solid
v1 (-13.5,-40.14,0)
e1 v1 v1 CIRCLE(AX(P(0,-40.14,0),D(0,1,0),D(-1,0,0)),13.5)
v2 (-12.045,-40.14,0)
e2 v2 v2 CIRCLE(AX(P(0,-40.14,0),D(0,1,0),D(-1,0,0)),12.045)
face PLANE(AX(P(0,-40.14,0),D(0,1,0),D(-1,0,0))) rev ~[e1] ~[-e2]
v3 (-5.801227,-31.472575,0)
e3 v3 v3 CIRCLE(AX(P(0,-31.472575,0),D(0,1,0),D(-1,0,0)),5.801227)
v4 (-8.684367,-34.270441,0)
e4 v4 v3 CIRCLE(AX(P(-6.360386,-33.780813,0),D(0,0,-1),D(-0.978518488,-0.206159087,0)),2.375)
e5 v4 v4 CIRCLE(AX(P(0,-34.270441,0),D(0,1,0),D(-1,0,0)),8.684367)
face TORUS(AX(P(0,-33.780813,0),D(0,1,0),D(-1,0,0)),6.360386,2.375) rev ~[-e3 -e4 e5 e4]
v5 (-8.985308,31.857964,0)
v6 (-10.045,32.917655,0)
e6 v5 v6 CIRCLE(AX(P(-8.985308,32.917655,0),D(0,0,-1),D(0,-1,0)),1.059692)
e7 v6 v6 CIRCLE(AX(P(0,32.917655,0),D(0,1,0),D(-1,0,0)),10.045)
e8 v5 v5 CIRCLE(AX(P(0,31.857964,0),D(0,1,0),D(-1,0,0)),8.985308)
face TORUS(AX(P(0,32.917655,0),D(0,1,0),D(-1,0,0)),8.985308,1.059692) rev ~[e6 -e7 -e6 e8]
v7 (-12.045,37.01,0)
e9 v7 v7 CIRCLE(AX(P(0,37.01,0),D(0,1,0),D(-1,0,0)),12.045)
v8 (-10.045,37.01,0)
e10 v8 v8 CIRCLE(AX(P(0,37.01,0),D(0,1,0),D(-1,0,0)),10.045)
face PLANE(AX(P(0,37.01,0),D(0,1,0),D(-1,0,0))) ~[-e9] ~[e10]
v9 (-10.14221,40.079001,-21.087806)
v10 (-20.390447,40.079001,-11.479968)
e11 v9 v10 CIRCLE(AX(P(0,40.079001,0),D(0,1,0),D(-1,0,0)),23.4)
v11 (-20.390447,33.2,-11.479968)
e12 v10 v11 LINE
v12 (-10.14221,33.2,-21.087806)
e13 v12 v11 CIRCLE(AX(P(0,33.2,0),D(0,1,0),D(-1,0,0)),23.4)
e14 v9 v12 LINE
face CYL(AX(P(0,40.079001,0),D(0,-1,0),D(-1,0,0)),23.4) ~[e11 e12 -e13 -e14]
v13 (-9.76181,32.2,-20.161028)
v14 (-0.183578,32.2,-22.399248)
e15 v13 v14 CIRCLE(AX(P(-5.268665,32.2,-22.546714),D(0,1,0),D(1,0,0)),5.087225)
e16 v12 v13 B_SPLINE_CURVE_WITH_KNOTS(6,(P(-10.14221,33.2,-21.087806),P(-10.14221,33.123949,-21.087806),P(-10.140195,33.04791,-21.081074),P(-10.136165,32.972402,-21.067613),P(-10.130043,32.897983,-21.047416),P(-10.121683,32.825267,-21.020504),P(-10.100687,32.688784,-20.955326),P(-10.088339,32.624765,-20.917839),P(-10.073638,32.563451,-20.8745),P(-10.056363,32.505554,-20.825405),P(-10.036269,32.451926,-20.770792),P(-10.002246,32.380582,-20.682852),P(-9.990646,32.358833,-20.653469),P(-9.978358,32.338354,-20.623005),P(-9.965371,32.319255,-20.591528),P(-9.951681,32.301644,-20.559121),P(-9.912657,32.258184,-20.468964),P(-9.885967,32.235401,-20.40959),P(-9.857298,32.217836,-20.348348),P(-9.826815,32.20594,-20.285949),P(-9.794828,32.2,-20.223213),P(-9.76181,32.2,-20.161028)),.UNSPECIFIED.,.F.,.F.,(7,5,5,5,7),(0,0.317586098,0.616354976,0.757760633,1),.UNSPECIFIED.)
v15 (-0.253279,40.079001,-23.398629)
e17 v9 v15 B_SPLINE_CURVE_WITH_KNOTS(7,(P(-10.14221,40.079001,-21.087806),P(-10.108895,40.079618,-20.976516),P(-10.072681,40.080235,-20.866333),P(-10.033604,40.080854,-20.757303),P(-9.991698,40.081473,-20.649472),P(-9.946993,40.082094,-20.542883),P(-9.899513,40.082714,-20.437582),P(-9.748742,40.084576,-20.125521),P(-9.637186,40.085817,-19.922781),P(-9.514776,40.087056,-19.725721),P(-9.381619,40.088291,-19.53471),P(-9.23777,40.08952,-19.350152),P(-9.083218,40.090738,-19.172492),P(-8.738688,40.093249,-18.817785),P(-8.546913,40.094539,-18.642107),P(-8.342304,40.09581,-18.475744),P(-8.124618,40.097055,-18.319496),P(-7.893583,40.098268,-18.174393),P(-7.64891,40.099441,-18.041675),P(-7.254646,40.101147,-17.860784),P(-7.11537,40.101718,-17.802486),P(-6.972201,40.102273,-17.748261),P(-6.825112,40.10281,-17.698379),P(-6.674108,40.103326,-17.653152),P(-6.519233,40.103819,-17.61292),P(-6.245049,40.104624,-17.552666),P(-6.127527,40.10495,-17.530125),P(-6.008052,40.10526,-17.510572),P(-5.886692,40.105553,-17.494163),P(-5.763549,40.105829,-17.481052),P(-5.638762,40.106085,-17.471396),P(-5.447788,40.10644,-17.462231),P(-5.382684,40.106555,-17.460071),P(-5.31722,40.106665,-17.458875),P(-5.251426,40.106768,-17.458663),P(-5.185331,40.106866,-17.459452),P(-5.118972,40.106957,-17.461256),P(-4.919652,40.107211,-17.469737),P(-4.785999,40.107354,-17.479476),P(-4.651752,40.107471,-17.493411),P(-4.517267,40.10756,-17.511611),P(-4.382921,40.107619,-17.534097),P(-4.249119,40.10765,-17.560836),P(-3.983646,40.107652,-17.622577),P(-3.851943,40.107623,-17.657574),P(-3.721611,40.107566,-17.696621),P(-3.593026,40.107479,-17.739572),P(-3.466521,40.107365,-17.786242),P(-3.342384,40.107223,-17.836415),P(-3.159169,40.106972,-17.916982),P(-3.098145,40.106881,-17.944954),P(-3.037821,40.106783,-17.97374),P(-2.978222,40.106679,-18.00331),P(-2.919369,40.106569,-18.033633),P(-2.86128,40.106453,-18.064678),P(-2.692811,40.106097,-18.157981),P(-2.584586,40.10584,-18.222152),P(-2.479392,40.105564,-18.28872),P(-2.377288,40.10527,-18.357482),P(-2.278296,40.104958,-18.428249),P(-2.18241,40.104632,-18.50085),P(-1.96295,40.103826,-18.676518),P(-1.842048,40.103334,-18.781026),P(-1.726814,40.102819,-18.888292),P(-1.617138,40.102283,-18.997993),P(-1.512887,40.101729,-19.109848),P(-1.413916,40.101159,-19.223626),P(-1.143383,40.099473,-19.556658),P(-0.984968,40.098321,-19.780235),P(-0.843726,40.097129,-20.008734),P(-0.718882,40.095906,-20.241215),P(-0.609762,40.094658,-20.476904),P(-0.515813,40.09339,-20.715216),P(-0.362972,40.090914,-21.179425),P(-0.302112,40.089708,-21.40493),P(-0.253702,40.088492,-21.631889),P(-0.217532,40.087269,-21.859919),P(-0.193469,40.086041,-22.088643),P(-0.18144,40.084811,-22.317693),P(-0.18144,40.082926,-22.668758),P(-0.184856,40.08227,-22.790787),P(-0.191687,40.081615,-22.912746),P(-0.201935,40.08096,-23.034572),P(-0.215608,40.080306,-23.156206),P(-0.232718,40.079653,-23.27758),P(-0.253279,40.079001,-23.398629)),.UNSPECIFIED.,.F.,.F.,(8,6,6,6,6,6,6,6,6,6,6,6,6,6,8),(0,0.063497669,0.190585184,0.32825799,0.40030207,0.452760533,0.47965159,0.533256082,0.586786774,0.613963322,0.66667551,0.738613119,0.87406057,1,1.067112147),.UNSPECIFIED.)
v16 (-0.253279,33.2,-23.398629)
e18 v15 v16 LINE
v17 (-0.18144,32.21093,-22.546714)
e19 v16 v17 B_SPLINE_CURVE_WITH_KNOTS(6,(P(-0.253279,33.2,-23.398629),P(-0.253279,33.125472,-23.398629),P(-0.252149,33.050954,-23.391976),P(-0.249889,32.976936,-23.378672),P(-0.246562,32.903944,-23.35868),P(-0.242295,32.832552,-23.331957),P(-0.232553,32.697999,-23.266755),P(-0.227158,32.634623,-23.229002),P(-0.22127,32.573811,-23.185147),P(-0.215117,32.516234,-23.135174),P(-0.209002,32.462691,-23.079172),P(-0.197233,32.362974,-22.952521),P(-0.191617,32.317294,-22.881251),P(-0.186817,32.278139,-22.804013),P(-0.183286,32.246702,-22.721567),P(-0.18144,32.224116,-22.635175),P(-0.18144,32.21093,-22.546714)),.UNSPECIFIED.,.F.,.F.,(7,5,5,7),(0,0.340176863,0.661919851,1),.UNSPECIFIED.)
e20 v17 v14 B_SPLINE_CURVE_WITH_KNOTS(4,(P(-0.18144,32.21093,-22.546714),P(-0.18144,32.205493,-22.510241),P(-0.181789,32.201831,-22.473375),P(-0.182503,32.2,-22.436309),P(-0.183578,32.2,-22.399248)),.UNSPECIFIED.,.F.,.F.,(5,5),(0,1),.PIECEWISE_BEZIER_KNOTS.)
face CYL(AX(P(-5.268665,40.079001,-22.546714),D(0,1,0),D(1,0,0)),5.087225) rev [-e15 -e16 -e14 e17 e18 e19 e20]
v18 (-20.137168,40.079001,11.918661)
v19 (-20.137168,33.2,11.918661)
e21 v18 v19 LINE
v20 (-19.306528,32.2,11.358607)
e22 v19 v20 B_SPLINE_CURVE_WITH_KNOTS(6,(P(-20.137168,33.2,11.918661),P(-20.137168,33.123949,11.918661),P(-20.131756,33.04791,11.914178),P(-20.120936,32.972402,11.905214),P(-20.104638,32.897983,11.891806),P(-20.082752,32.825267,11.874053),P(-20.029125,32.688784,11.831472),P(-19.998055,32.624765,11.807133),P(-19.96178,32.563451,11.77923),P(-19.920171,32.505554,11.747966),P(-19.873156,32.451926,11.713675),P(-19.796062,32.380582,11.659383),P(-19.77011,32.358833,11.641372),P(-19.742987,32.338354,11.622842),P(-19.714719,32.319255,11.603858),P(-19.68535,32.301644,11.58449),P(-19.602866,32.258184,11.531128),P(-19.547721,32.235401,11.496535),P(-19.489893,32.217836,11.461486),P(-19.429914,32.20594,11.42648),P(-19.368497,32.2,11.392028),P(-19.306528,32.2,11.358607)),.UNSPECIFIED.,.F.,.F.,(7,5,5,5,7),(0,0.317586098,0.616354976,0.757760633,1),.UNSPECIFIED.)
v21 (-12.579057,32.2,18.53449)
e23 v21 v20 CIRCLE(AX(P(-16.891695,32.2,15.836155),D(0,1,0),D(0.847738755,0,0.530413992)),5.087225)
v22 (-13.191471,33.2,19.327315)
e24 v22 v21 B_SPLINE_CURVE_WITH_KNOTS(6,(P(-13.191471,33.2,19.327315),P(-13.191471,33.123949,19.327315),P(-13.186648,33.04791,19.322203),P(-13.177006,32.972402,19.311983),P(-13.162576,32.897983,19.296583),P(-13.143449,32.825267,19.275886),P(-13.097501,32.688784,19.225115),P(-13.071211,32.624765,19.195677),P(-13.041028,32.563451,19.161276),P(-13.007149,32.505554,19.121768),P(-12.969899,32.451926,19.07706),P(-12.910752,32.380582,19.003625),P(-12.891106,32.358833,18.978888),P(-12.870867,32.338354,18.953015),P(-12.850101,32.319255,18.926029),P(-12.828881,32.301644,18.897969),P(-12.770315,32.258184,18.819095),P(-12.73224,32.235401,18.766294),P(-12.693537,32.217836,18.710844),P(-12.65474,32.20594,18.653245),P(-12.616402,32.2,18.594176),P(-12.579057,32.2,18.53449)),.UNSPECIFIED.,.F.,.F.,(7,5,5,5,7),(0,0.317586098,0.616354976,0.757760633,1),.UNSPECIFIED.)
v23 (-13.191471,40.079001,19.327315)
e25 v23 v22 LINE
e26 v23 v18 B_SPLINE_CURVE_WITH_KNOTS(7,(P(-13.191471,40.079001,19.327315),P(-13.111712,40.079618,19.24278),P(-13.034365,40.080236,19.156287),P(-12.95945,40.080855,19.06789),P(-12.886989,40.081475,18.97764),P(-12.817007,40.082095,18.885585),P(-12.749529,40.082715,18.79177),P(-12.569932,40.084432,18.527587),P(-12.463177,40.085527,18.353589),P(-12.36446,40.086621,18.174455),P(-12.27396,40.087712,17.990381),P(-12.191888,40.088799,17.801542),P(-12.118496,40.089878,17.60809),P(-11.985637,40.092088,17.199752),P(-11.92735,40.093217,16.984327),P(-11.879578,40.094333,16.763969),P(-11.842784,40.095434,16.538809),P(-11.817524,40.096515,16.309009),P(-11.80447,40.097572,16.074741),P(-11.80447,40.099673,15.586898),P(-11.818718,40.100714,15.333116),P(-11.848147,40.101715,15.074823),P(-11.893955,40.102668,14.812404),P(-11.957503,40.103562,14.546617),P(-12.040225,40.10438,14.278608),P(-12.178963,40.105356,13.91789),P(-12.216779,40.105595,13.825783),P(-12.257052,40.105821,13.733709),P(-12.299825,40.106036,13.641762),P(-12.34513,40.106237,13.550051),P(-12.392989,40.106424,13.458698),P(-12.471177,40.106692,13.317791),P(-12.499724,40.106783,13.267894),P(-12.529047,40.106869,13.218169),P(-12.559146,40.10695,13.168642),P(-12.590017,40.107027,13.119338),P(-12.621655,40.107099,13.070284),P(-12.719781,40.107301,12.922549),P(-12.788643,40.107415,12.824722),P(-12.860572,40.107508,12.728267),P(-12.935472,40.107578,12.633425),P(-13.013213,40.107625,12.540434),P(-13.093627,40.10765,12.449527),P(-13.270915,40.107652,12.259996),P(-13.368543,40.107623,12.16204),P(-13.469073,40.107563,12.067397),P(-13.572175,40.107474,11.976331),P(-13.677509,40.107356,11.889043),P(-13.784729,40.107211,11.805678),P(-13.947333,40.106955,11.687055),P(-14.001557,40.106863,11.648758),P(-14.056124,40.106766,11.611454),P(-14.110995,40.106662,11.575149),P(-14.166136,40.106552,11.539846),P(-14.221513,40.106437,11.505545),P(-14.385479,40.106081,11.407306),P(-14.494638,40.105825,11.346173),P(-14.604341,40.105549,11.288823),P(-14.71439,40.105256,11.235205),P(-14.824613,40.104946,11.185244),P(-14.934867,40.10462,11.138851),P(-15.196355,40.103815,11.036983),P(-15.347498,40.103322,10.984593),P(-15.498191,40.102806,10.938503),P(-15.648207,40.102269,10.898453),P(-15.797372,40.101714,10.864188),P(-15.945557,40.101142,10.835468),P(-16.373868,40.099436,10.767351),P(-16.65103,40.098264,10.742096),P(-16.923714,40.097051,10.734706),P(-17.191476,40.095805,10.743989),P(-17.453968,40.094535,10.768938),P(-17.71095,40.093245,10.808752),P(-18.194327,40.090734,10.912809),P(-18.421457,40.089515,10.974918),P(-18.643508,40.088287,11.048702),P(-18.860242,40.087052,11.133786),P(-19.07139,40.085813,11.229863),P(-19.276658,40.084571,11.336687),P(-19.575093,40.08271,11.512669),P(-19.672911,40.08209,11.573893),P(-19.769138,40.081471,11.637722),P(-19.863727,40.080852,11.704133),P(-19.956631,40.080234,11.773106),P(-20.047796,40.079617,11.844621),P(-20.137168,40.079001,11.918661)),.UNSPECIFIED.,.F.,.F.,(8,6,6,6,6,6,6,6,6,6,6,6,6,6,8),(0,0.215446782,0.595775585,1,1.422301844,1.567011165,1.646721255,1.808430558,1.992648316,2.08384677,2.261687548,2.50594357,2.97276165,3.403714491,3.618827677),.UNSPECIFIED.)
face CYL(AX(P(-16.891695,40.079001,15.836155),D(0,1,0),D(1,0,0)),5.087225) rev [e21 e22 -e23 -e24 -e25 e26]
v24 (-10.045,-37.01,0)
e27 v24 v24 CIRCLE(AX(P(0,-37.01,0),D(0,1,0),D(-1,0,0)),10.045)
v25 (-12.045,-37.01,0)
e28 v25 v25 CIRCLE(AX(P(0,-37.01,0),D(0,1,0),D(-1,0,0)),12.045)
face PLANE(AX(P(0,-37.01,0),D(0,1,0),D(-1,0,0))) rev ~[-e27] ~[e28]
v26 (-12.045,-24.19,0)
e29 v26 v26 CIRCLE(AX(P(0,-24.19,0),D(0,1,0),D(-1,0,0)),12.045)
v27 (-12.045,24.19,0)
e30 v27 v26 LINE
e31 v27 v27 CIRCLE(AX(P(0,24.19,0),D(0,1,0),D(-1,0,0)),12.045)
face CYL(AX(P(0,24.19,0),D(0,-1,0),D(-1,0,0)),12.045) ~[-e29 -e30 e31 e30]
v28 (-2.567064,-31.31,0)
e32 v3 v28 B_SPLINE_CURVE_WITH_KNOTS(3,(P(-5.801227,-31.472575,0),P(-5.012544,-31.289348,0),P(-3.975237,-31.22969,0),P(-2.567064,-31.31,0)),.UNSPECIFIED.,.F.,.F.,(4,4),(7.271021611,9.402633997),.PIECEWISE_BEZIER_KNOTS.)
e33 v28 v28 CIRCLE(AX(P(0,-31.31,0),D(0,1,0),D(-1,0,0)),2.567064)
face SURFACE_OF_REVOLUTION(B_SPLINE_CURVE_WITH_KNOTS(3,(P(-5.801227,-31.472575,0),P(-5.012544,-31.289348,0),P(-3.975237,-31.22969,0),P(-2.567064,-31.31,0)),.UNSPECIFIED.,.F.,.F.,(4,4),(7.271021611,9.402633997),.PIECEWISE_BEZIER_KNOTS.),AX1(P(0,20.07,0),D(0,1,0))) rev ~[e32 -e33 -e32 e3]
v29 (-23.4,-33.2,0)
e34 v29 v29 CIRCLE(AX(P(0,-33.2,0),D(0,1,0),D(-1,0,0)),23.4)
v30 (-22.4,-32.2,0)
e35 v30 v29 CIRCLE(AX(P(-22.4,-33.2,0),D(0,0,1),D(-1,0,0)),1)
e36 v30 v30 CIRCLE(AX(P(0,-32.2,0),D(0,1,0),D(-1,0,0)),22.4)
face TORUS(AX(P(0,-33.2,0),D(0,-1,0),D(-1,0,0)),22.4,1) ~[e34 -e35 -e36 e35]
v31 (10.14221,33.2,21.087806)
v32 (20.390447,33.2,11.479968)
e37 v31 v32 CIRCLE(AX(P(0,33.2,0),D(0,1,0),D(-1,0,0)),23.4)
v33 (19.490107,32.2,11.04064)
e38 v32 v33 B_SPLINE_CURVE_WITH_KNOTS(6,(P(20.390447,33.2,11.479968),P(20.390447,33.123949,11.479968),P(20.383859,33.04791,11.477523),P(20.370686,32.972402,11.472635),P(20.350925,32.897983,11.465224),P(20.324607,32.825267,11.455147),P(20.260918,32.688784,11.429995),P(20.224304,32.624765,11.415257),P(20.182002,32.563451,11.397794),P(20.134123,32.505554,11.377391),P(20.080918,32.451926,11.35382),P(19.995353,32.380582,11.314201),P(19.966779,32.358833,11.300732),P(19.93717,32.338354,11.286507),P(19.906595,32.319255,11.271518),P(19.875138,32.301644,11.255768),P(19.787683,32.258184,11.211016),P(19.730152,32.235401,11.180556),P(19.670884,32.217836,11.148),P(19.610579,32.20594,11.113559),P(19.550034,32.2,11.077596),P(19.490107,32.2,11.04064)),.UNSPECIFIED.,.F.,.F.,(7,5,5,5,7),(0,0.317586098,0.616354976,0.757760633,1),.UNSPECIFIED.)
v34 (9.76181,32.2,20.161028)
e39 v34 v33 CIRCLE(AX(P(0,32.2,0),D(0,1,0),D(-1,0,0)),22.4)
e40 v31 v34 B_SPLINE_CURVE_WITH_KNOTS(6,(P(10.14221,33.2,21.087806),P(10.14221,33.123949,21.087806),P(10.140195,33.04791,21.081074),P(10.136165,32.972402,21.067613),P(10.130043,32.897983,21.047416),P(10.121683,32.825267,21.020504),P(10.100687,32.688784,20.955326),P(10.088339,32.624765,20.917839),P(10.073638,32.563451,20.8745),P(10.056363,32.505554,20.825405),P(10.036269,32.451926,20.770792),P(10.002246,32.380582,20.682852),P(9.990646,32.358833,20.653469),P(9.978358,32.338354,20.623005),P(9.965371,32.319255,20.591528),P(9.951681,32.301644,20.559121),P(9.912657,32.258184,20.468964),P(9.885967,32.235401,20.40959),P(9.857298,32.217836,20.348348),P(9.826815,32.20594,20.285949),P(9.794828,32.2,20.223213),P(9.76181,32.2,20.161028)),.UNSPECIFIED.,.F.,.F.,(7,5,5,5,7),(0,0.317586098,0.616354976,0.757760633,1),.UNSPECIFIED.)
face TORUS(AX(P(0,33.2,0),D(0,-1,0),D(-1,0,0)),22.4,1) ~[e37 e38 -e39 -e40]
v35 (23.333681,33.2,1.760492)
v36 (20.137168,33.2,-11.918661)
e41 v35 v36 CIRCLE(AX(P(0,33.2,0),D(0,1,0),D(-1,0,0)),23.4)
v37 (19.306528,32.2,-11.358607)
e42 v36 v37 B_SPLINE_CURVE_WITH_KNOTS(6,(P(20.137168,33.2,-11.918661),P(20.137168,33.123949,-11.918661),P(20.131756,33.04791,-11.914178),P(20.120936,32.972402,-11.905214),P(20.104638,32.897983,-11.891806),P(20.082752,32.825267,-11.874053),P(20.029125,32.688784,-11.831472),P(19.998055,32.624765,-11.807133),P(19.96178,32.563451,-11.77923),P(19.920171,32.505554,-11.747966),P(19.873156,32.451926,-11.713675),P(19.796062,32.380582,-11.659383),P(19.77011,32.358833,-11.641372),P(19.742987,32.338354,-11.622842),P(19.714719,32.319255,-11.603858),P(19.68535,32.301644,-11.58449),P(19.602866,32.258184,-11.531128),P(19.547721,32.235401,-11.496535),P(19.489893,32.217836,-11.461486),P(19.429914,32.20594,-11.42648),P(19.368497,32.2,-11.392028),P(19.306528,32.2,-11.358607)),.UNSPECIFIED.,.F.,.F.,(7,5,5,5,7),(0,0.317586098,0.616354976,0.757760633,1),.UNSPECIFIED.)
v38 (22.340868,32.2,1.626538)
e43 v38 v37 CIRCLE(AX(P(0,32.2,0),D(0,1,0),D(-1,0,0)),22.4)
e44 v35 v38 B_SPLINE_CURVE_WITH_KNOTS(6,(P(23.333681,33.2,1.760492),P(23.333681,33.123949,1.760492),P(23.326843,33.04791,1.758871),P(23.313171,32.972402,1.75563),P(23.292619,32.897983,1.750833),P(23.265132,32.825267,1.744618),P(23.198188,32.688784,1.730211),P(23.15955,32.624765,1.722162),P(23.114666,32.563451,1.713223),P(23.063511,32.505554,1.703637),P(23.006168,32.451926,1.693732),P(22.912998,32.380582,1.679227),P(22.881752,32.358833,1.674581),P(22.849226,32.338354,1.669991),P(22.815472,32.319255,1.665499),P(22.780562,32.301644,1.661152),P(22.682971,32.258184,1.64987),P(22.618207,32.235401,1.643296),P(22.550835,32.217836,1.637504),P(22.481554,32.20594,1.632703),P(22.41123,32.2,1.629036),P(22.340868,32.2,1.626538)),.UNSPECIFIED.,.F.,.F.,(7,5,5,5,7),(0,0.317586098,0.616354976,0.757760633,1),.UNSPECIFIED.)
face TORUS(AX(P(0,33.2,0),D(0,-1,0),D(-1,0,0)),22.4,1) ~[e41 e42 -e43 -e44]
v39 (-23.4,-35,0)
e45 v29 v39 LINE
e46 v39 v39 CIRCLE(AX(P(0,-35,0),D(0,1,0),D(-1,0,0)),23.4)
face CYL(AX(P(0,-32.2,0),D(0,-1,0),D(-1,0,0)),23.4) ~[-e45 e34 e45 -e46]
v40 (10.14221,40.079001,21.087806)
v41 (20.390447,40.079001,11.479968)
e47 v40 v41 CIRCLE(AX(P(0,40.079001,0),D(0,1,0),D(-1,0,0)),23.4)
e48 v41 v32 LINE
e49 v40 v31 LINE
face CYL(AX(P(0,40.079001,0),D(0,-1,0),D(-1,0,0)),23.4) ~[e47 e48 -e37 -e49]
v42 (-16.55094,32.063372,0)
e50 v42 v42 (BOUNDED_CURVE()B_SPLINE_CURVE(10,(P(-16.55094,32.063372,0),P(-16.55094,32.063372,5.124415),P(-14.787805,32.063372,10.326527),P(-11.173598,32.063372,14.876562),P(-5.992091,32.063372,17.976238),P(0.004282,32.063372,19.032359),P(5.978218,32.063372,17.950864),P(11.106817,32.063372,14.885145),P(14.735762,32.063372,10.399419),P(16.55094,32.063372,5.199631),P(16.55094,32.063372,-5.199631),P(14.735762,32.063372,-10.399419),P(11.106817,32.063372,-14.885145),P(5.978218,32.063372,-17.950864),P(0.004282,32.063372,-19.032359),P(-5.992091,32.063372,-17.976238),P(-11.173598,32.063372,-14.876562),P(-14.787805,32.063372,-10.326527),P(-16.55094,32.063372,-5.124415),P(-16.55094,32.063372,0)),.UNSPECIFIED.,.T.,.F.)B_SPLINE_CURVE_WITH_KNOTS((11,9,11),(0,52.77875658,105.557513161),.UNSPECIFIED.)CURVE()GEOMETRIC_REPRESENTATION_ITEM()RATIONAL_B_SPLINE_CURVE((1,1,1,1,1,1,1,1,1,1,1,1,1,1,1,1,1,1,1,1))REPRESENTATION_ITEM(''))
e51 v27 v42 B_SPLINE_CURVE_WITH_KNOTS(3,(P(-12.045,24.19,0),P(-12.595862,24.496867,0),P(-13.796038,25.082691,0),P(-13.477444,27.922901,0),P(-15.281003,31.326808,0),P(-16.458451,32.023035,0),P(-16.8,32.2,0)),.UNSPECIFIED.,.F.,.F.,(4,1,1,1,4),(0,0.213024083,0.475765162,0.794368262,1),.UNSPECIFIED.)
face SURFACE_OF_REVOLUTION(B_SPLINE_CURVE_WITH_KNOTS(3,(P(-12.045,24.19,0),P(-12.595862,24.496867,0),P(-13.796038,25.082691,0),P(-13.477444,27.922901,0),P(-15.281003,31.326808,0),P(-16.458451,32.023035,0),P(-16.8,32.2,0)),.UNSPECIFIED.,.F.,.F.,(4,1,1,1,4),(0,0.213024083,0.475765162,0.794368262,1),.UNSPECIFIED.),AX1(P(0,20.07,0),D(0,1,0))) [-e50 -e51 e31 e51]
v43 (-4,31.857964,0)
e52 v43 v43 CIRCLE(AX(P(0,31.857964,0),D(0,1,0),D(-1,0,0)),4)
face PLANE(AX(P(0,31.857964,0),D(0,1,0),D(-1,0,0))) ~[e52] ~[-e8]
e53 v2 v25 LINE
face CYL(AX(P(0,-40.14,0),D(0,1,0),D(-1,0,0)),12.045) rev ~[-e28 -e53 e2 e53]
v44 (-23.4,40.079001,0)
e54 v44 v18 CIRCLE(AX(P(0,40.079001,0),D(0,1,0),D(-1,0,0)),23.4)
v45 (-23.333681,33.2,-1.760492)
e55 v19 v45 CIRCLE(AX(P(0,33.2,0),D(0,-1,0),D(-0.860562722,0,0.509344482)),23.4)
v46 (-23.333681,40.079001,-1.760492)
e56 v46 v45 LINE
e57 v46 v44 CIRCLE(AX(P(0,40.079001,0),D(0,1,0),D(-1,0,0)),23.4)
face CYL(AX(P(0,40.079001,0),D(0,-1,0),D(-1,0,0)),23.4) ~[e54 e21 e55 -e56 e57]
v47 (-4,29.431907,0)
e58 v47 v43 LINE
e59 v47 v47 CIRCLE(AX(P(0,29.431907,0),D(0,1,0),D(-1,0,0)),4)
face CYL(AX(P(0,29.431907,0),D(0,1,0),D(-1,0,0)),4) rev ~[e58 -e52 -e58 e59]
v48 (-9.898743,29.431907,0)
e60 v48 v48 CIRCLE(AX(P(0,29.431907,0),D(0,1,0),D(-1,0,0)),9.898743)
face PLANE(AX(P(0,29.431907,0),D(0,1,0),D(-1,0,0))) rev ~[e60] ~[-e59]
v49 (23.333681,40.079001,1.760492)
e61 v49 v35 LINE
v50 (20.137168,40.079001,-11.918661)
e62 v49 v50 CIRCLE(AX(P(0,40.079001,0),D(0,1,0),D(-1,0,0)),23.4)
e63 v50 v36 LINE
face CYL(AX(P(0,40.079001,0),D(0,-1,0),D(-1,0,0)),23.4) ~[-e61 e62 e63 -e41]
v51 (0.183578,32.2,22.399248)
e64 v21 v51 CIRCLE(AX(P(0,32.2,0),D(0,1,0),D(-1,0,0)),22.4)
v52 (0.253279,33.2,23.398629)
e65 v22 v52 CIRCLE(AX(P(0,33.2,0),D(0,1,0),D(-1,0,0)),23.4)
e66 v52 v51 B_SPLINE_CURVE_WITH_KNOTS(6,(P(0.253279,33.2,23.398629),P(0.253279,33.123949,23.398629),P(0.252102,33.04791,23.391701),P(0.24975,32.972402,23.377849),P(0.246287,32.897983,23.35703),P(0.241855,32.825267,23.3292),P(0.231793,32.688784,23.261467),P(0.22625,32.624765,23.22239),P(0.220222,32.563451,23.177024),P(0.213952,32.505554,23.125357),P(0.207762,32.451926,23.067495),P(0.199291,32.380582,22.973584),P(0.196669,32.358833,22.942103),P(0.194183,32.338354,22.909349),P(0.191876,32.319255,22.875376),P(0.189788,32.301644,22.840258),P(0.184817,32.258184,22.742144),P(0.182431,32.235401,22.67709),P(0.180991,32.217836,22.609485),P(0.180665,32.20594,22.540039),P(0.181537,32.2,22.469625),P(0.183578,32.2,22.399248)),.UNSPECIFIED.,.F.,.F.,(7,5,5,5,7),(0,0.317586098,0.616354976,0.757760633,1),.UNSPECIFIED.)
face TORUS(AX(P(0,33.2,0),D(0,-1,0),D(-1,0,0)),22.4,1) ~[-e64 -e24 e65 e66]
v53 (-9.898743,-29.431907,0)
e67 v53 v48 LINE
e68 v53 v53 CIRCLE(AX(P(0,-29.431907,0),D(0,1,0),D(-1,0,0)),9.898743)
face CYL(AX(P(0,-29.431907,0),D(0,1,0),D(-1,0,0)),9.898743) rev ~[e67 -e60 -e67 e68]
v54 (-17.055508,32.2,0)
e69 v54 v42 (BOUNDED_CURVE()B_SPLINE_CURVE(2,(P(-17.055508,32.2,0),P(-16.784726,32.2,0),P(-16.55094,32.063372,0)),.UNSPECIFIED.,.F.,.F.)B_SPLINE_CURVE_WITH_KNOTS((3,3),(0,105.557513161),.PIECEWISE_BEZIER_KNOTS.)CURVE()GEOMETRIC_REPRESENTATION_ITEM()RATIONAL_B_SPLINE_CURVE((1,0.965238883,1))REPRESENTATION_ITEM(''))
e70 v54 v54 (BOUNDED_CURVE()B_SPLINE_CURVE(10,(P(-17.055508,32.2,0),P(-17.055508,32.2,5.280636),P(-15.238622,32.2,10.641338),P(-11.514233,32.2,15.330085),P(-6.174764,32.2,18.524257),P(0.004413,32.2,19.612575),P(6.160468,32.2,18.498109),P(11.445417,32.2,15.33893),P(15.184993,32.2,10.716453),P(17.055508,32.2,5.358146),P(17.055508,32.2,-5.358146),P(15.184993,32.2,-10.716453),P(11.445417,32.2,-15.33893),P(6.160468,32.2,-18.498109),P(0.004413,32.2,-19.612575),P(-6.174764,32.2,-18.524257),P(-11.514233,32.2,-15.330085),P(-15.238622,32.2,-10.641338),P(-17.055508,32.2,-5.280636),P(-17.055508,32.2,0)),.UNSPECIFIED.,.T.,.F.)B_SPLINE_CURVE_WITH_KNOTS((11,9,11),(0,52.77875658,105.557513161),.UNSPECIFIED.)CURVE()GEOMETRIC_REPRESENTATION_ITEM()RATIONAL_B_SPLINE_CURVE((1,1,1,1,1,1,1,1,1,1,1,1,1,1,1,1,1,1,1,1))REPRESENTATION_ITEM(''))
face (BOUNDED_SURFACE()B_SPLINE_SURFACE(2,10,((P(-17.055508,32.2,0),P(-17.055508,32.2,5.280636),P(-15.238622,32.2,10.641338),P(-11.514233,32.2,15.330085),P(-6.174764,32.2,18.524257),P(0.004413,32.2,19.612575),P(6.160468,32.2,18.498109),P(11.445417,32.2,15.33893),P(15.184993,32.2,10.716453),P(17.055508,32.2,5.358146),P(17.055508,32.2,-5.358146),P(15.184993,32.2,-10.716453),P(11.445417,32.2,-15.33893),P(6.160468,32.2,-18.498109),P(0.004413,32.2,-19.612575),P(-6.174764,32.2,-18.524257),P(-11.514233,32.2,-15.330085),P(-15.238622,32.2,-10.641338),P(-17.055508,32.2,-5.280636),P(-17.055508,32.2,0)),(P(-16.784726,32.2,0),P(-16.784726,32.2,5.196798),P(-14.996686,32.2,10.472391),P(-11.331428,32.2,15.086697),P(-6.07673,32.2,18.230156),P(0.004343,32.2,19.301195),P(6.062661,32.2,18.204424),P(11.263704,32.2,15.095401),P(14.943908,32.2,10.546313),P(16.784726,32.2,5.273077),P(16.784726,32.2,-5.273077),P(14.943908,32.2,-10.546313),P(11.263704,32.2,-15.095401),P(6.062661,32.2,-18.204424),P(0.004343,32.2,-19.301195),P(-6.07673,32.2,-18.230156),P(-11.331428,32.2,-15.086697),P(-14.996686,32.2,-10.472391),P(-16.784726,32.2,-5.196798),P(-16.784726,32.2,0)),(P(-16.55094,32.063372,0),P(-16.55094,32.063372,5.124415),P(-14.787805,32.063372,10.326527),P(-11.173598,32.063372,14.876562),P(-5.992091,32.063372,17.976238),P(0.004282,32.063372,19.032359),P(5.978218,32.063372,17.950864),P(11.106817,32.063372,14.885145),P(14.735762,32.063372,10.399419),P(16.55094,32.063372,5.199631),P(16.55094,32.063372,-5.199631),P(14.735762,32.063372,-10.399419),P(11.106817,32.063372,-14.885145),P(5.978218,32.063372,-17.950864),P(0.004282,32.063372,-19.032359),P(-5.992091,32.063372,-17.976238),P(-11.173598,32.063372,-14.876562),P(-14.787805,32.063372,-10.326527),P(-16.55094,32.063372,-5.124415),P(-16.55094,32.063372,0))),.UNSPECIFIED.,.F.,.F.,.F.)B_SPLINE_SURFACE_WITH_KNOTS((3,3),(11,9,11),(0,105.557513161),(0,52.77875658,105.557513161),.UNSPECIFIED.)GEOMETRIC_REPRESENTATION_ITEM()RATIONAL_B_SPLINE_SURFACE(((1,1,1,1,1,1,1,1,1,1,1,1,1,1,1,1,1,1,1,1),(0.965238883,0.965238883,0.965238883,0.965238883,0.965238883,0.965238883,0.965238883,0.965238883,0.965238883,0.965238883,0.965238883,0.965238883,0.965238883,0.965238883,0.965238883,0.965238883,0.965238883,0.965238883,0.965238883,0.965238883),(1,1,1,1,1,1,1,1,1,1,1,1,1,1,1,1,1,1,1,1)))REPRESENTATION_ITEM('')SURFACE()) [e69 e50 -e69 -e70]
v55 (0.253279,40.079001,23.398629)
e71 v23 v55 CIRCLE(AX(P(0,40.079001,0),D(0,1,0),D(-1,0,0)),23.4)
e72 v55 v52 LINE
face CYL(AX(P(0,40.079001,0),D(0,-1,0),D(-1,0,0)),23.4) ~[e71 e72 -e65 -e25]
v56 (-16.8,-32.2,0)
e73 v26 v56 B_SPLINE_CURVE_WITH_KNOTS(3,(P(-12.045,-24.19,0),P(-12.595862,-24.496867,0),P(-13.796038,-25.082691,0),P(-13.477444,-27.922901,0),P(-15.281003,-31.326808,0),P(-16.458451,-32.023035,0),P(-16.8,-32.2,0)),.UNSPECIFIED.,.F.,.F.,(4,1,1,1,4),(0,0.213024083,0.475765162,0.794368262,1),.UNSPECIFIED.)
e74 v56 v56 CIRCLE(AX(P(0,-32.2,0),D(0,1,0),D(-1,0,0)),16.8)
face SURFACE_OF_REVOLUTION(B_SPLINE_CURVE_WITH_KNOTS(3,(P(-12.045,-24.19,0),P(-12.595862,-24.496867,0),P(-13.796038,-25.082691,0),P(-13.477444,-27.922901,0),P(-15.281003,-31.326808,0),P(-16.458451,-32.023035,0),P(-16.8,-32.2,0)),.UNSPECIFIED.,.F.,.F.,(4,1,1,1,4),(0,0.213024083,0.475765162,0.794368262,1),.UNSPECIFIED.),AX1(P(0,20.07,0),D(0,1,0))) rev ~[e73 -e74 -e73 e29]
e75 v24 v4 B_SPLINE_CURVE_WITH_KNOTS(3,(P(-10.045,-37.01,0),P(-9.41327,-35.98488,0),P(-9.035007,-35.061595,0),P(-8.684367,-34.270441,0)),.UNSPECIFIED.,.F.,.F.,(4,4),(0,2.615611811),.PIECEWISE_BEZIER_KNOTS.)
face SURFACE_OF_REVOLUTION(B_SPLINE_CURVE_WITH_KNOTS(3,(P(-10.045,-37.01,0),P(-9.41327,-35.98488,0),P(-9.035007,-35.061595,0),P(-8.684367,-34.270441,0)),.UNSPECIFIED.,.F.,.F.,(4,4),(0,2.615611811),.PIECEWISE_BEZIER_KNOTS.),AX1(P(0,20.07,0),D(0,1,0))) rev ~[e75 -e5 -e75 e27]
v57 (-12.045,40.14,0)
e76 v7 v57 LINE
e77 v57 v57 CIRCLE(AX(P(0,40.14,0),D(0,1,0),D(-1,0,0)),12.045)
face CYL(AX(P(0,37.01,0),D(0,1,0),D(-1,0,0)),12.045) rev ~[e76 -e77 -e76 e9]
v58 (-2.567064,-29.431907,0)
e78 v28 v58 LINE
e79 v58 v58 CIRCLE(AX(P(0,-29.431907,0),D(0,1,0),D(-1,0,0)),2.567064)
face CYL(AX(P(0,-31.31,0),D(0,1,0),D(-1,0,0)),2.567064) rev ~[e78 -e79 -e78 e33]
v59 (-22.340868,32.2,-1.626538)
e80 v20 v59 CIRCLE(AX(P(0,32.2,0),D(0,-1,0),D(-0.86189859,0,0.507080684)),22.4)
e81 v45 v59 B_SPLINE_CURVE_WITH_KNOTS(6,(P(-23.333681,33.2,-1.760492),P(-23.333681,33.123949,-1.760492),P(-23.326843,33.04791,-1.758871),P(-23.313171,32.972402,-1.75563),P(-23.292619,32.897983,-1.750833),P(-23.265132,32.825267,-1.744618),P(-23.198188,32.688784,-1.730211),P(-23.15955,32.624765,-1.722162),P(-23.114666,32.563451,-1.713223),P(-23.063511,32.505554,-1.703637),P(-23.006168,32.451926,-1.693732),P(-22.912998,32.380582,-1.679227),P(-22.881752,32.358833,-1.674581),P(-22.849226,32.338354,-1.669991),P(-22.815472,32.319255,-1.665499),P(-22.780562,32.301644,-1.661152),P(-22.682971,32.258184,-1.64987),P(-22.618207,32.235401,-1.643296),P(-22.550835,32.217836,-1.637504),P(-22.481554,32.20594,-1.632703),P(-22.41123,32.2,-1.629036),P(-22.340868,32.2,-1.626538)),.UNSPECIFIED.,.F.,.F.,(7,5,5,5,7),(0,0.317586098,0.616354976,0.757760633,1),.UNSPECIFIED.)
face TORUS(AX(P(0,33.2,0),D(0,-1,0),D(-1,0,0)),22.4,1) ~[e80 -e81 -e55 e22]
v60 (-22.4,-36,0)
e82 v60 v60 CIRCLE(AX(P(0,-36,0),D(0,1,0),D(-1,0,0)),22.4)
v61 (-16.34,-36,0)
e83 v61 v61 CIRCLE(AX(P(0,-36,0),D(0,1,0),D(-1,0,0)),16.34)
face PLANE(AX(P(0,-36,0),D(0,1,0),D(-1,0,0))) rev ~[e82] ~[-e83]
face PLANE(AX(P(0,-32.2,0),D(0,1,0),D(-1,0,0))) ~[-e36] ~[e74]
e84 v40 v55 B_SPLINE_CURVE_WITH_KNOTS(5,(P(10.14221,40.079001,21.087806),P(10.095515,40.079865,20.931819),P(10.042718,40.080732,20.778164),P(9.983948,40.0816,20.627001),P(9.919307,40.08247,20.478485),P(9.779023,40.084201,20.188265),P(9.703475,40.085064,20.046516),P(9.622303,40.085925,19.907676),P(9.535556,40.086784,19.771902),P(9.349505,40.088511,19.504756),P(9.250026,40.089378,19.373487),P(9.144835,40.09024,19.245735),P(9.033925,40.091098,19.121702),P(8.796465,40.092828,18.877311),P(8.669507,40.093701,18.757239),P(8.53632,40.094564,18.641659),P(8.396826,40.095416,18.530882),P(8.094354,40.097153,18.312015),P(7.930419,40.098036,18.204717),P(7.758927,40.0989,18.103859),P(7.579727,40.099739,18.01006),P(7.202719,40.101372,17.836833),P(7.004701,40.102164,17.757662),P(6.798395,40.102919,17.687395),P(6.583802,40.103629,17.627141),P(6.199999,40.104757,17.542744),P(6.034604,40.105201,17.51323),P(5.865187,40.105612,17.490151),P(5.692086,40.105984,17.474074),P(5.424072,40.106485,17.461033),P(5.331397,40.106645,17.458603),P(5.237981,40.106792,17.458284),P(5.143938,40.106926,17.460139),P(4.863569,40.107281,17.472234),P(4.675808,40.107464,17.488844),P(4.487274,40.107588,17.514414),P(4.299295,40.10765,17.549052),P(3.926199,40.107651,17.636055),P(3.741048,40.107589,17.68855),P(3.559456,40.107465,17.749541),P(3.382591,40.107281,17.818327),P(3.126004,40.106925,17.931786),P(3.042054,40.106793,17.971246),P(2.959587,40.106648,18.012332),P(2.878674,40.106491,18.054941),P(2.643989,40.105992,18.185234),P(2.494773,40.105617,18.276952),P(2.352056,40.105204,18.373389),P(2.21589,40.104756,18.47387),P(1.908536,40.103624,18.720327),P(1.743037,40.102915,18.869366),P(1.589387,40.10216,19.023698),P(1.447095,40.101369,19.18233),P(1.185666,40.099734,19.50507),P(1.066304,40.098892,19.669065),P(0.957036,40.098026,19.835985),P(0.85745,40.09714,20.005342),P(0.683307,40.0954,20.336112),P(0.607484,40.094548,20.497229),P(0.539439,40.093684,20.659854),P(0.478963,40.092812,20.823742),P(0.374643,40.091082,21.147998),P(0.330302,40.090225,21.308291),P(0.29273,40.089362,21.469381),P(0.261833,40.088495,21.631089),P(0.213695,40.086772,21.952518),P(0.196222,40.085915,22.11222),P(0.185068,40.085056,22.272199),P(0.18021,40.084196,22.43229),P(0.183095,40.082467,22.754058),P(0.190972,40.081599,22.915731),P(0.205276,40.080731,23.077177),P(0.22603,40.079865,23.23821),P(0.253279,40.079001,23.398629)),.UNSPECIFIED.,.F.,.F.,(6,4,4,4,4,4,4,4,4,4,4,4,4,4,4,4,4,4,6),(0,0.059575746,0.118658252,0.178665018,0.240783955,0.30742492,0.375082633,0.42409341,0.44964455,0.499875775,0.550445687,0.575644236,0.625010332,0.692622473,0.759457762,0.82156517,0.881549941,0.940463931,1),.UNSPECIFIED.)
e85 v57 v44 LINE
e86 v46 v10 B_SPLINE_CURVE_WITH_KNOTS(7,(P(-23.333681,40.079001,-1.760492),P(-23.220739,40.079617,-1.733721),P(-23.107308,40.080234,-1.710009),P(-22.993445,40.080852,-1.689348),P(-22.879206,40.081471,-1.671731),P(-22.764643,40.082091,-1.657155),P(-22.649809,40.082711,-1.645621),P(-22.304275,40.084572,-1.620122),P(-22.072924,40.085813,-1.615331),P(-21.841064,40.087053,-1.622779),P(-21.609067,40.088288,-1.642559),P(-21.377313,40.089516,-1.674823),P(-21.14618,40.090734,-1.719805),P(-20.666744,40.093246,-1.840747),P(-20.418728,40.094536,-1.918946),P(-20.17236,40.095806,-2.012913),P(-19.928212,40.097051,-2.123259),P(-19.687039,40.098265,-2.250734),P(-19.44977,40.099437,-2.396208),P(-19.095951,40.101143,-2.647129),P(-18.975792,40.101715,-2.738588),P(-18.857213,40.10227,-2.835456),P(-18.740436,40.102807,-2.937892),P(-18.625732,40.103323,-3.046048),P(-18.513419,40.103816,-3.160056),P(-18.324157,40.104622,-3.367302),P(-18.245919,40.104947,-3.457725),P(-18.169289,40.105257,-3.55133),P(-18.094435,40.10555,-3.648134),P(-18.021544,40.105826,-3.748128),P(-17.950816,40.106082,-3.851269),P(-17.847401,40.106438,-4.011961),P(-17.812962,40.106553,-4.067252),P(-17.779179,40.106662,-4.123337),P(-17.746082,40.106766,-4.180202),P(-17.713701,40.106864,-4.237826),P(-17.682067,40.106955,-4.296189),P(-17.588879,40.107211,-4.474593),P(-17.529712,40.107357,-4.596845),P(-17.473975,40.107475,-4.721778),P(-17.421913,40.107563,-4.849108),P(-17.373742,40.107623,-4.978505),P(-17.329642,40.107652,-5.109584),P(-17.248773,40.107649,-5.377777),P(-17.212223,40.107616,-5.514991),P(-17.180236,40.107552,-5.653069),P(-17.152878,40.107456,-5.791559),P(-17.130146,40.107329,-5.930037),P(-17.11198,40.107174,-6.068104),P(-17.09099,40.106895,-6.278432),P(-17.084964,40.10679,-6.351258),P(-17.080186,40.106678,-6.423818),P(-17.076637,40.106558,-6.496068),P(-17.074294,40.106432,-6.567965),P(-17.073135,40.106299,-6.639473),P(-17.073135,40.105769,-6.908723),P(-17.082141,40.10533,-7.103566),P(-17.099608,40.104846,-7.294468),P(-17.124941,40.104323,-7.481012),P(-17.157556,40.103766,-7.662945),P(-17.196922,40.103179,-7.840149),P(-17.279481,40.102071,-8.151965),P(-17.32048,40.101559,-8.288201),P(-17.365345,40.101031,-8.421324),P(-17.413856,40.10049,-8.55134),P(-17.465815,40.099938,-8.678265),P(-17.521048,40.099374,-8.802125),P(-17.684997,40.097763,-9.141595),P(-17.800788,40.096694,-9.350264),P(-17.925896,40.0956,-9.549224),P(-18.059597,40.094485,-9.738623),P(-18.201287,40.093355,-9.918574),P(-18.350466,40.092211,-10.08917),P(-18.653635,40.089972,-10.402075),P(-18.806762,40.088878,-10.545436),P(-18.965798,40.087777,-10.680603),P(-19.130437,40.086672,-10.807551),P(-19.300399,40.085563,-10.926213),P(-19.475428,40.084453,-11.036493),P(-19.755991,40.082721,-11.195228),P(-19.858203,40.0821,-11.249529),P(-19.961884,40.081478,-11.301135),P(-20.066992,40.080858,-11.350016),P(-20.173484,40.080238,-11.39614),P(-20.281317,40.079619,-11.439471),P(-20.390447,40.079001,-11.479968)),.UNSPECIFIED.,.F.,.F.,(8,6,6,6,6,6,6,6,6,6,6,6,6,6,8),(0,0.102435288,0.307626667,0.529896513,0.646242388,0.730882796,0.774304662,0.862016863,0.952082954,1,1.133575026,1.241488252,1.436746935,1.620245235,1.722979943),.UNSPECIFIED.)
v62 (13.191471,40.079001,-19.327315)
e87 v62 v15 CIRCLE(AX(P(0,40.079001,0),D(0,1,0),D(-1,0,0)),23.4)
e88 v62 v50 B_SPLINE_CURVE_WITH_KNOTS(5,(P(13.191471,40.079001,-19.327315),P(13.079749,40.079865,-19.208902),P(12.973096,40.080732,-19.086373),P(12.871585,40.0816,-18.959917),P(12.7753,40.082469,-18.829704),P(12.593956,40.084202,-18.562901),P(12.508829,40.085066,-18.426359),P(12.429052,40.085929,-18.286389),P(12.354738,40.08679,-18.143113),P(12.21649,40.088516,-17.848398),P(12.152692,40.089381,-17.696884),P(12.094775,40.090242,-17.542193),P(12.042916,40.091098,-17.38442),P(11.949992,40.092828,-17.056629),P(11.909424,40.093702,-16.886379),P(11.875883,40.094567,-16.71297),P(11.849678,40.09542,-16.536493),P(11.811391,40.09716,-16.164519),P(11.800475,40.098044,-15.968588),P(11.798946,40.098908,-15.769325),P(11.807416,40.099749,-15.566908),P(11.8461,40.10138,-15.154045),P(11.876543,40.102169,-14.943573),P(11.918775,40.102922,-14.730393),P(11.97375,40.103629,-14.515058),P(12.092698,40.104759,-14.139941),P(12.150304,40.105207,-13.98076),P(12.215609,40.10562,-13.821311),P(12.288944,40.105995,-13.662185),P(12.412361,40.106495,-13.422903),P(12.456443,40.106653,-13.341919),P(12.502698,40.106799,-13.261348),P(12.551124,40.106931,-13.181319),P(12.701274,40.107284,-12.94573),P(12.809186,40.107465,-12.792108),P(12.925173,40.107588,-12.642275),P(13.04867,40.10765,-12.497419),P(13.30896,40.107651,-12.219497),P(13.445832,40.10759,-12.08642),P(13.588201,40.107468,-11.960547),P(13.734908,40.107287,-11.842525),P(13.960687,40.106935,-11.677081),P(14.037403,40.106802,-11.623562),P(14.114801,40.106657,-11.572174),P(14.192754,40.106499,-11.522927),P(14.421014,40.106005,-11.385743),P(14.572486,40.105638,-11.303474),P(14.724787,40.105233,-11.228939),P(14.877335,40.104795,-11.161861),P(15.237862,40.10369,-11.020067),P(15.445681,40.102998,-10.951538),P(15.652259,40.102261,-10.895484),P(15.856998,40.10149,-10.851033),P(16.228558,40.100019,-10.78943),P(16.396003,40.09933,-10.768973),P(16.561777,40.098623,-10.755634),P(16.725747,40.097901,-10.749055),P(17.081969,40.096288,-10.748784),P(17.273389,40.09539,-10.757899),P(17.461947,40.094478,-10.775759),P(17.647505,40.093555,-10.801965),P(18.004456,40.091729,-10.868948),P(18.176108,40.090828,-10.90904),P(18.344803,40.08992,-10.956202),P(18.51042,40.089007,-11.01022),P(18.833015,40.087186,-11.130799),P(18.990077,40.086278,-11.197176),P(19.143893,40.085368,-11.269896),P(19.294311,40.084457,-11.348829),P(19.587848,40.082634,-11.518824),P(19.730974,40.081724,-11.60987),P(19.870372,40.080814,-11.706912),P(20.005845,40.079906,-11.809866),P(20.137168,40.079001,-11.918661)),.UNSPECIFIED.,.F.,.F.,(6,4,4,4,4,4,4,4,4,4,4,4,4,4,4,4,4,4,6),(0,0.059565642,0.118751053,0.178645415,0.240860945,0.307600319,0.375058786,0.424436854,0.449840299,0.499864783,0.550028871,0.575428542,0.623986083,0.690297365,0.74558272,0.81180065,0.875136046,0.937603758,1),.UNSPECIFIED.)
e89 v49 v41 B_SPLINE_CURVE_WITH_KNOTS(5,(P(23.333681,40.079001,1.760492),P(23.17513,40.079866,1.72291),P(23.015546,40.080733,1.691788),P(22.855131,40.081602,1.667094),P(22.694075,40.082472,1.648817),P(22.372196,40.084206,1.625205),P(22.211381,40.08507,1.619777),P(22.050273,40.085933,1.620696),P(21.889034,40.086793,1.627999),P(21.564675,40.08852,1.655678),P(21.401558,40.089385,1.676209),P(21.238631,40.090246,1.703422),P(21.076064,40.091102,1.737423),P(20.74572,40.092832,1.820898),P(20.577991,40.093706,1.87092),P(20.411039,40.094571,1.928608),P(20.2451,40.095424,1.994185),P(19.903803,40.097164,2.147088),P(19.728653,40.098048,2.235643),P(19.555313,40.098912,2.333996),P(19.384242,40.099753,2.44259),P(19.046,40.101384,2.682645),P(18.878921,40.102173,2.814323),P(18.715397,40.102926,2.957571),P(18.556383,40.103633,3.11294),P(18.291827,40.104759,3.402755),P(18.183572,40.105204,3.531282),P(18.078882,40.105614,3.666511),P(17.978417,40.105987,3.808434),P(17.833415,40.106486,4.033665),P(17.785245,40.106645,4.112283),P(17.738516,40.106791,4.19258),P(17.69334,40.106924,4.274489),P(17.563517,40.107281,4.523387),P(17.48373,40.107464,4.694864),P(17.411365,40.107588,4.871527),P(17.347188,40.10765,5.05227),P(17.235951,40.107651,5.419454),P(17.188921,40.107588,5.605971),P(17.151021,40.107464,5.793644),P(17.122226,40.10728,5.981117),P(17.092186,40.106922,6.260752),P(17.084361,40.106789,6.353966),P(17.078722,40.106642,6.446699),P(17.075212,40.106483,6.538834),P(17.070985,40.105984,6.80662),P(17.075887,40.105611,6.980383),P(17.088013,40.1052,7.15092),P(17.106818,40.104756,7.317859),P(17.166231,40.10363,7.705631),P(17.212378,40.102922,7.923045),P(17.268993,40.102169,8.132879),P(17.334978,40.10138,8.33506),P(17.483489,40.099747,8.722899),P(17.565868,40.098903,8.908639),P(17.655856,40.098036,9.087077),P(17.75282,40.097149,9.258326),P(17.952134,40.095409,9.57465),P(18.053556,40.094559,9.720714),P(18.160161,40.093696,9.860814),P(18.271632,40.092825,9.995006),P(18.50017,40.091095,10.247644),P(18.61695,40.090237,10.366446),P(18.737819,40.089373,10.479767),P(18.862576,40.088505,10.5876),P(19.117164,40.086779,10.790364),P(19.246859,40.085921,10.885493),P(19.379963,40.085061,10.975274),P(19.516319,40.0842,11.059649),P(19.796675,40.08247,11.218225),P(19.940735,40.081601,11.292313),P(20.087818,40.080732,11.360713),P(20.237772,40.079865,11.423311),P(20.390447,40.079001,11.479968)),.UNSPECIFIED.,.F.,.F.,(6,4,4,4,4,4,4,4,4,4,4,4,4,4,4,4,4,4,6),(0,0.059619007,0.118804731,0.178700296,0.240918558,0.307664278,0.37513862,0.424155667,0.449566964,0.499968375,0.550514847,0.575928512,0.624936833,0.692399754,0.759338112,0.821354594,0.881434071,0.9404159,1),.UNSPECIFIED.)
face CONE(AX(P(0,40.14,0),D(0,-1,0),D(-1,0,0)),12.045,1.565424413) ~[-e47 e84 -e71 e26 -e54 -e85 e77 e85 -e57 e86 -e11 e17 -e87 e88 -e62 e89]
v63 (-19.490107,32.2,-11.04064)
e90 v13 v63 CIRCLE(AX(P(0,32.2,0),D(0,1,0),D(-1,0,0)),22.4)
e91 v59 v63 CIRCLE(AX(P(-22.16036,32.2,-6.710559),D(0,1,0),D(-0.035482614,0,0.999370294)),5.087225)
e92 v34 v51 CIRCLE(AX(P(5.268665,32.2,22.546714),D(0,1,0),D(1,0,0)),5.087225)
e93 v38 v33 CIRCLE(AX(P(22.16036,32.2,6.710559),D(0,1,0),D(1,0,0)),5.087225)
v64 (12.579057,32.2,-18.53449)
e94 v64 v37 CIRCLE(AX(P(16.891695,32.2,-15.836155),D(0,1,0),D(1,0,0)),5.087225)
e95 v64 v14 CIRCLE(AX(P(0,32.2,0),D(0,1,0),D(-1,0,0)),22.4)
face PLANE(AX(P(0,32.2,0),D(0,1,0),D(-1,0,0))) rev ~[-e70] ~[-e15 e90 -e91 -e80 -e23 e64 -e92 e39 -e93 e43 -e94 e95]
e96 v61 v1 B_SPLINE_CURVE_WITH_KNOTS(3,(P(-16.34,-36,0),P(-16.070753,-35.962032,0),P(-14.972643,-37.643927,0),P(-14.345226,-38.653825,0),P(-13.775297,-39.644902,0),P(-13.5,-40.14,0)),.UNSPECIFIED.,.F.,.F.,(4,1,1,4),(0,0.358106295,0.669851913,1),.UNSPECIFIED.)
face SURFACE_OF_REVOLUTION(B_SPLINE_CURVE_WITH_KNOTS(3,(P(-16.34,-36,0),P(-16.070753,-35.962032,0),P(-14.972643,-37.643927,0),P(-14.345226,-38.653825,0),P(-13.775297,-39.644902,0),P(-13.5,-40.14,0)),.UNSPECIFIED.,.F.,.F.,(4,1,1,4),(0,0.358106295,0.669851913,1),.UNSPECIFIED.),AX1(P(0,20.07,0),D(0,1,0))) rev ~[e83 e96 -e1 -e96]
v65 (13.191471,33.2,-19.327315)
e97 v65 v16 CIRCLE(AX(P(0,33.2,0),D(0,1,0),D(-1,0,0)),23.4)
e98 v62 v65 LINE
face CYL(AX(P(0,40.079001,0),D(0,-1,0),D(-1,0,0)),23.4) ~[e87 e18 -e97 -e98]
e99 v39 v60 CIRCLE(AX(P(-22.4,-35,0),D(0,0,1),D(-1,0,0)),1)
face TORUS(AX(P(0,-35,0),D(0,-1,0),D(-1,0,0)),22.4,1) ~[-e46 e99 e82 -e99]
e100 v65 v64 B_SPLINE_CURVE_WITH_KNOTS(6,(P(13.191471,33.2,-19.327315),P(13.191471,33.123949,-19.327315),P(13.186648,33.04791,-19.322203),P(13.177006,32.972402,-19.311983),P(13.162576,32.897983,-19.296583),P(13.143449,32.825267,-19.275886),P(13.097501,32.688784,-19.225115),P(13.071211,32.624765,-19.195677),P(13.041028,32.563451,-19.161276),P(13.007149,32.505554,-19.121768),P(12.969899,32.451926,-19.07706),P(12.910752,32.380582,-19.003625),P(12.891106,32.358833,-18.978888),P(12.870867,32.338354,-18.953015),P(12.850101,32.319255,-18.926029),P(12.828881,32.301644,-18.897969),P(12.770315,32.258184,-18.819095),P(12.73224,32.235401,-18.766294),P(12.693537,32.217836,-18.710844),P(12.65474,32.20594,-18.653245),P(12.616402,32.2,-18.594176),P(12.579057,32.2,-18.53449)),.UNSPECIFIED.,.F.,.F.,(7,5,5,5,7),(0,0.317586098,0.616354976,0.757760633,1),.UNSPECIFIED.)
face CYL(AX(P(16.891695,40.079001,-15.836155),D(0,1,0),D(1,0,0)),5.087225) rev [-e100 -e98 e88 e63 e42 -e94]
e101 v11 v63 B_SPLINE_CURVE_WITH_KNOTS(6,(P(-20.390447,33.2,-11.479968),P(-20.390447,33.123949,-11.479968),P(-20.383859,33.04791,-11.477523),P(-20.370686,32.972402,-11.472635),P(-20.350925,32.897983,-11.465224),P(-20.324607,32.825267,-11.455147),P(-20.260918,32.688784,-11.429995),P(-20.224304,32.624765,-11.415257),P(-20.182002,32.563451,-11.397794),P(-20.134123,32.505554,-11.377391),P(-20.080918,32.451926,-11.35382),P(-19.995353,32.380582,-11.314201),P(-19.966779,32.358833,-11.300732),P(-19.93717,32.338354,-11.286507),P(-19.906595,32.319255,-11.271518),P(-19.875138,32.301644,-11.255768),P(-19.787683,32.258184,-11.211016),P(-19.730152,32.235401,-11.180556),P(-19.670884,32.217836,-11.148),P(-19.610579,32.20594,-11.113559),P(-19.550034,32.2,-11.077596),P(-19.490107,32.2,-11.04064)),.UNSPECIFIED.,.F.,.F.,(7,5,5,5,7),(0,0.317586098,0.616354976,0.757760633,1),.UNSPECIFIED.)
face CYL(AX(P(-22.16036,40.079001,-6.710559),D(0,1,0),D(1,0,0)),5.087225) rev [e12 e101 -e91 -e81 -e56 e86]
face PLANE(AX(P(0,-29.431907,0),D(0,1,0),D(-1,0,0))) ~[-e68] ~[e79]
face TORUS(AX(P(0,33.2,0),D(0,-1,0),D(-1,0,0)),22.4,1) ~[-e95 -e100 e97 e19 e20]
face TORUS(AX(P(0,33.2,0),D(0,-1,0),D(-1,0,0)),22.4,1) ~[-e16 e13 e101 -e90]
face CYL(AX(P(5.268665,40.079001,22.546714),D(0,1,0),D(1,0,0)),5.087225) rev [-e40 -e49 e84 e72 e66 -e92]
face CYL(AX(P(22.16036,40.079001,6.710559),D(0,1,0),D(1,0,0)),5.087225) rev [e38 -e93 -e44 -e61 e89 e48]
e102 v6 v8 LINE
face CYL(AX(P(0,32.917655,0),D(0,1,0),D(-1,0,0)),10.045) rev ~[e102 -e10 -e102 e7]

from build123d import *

# Parameters (mm, degrees)
F2_R          = 1
F4_R          = 5.0872245557
F5_DEPTH      = 25
F5_DEPTH_BACK = 25


# Not quite as in the source:
# - a feature names something its author has since deleted; it is built from what else it names


with BuildPart() as f1:
    # F0 (on Top) → F1 (revolve)
    with BuildSketch(Plane.XY):
        with BuildLine():
            Line((-12.045, 24.19), (-12.045, 0))
            Line((-12.045, 0), (-12.045, -24.19))
            add(Edge.make_bspline(
                [(-12.045, -24.19), (-12.5958616321, -24.4968671697), (-13.7960381357, -25.0826911965), (-13.4774444038, -27.9229008757), (-15.2810031254, -31.3268076458), (-16.4584506699, -32.0230348179), (-16.8, -32.2)],
                knots=[0, 0, 0, 0, 0.2130240833, 0.4757651617, 0.7943682617, 1, 1, 1, 1], degree=3))
            Line((-16.8, -32.2), (-23.4, -32.2))
            Line((-23.4, -32.2), (-23.4, -36))
            Line((-23.4, -36), (-16.34, -36))
            add(Edge.make_bspline(
                [(-16.34, -36), (-16.0707529319, -35.9620323671), (-14.9726425226, -37.6439271493), (-14.3452255143, -38.6538248832), (-13.7752974798, -39.6449017449), (-13.5, -40.14)],
                knots=[0, 0, 0, 0, 0.3581062946, 0.6698519127, 1, 1, 1, 1], degree=3))
            Line((-13.5, -40.14), (-12.045, -40.14))
            Line((-12.045, -40.14), (-12.045, -37.01))
            Line((-12.045, -37.01), (-10.045, -37.01))
            add(Edge.make_bspline(
                [(-10.045, -37.01), (-9.4132699561, -35.9848800804), (-9.0350072413, -35.0615949654), (-8.684367441, -34.2704410489)],
                knots=[0, 0, 0, 0, 2.6156118111, 2.6156118111, 2.6156118111, 2.6156118111], degree=3))
            ThreePointArc((-8.684367441, -34.2704410489), (-8.0143701637, -32.0764184583), (-5.8012267005, -31.4725745291))
            add(Edge.make_bspline(
                [(-5.8012267005, -31.4725745291), (-5.0125441811, -31.2893478801), (-3.9752367105, -31.2296903089), (-2.5670640498, -31.31)],
                knots=[7.2710216109, 7.2710216109, 7.2710216109, 7.2710216109, 9.4026339966, 9.4026339966, 9.4026339966, 9.4026339966], degree=3))
            Line((-2.5670640498, -31.31), (-2.5670640498, -29.4319074601))
            Line((-2.5670640498, -29.4319074601), (-9.8987429366, -29.4319074601))
            Line((-9.8987429366, -29.4319074601), (-9.8987429366, 0))
            Line((-9.8987429366, 0), (-9.8987429366, 29.4319074601))
            Line((-9.8987429366, 29.4319074601), (-4, 29.4319074601))
            Line((-4, 29.4319074601), (-4, 31.8579636514))
            Line((-4, 31.8579636514), (-8.9853084335, 31.8579636514))
            ThreePointArc((-8.9853084335, 31.8579636514), (-9.7346235261, 32.1683401253), (-10.045, 32.9176552179))
            Line((-10.045, 32.9176552179), (-10.045, 37.01))
            Line((-10.045, 37.01), (-12.045, 37.01))
            Line((-12.045, 37.01), (-12.045, 40.14))
            Line((-12.045, 40.14), (-23.4, 40.0790013373))
            Line((-23.4, 40.0790013373), (-23.4, 32.2))
            Line((-23.4, 32.2), (-16.8, 32.2))
            add(Edge.make_bspline(
                [(-12.045, 24.19), (-12.5958616321, 24.4968671697), (-13.7960381357, 25.0826911965), (-13.4774444038, 27.9229008757), (-15.2810031254, 31.3268076458), (-16.4584506699, 32.0230348179), (-16.8, 32.2)],
                knots=[0, 0, 0, 0, 0.2130240833, 0.4757651617, 0.7943682617, 1, 1, 1, 1], degree=3))
        make_face()
    revolve(axis=Axis((0, 20.07, 0), (0, 1, 0)))

    # F2
    f2_edges = [f1.edges().sort_by_distance(p)[0] for p in [
        (23.4, -32.2, 0),
        (23.4, -36, 0),
        (23.4, 32.2, 0),
        (16.8, 32.2, 0),
    ]]
    fillet(f2_edges, radius=F2_R)

    # F4 (on plane+point) → F5 (cut, two sides)
    with BuildSketch(Plane.XZ.offset(-40.0790013373)) as f5_sk:
        with Locations((-5.2686650306, -22.5467141718)):
            Circle(F4_R)
        with Locations((16.8916947293, -15.8361548464)):
            Circle(F4_R)
        with Locations((22.1603597599, 6.7105593254)):
            Circle(F4_R)
        with Locations((5.2686650306, 22.5467141718)):
            Circle(F4_R)
        with Locations((-16.8916947293, 15.8361548464)):
            Circle(F4_R)
        with Locations((-22.1603597599, -6.7105593254)):
            Circle(F4_R)
    extrude(amount=F5_DEPTH, mode=Mode.SUBTRACT)
    extrude(f5_sk.sketch, amount=-F5_DEPTH_BACK, mode=Mode.SUBTRACT)


solid = f1.part
